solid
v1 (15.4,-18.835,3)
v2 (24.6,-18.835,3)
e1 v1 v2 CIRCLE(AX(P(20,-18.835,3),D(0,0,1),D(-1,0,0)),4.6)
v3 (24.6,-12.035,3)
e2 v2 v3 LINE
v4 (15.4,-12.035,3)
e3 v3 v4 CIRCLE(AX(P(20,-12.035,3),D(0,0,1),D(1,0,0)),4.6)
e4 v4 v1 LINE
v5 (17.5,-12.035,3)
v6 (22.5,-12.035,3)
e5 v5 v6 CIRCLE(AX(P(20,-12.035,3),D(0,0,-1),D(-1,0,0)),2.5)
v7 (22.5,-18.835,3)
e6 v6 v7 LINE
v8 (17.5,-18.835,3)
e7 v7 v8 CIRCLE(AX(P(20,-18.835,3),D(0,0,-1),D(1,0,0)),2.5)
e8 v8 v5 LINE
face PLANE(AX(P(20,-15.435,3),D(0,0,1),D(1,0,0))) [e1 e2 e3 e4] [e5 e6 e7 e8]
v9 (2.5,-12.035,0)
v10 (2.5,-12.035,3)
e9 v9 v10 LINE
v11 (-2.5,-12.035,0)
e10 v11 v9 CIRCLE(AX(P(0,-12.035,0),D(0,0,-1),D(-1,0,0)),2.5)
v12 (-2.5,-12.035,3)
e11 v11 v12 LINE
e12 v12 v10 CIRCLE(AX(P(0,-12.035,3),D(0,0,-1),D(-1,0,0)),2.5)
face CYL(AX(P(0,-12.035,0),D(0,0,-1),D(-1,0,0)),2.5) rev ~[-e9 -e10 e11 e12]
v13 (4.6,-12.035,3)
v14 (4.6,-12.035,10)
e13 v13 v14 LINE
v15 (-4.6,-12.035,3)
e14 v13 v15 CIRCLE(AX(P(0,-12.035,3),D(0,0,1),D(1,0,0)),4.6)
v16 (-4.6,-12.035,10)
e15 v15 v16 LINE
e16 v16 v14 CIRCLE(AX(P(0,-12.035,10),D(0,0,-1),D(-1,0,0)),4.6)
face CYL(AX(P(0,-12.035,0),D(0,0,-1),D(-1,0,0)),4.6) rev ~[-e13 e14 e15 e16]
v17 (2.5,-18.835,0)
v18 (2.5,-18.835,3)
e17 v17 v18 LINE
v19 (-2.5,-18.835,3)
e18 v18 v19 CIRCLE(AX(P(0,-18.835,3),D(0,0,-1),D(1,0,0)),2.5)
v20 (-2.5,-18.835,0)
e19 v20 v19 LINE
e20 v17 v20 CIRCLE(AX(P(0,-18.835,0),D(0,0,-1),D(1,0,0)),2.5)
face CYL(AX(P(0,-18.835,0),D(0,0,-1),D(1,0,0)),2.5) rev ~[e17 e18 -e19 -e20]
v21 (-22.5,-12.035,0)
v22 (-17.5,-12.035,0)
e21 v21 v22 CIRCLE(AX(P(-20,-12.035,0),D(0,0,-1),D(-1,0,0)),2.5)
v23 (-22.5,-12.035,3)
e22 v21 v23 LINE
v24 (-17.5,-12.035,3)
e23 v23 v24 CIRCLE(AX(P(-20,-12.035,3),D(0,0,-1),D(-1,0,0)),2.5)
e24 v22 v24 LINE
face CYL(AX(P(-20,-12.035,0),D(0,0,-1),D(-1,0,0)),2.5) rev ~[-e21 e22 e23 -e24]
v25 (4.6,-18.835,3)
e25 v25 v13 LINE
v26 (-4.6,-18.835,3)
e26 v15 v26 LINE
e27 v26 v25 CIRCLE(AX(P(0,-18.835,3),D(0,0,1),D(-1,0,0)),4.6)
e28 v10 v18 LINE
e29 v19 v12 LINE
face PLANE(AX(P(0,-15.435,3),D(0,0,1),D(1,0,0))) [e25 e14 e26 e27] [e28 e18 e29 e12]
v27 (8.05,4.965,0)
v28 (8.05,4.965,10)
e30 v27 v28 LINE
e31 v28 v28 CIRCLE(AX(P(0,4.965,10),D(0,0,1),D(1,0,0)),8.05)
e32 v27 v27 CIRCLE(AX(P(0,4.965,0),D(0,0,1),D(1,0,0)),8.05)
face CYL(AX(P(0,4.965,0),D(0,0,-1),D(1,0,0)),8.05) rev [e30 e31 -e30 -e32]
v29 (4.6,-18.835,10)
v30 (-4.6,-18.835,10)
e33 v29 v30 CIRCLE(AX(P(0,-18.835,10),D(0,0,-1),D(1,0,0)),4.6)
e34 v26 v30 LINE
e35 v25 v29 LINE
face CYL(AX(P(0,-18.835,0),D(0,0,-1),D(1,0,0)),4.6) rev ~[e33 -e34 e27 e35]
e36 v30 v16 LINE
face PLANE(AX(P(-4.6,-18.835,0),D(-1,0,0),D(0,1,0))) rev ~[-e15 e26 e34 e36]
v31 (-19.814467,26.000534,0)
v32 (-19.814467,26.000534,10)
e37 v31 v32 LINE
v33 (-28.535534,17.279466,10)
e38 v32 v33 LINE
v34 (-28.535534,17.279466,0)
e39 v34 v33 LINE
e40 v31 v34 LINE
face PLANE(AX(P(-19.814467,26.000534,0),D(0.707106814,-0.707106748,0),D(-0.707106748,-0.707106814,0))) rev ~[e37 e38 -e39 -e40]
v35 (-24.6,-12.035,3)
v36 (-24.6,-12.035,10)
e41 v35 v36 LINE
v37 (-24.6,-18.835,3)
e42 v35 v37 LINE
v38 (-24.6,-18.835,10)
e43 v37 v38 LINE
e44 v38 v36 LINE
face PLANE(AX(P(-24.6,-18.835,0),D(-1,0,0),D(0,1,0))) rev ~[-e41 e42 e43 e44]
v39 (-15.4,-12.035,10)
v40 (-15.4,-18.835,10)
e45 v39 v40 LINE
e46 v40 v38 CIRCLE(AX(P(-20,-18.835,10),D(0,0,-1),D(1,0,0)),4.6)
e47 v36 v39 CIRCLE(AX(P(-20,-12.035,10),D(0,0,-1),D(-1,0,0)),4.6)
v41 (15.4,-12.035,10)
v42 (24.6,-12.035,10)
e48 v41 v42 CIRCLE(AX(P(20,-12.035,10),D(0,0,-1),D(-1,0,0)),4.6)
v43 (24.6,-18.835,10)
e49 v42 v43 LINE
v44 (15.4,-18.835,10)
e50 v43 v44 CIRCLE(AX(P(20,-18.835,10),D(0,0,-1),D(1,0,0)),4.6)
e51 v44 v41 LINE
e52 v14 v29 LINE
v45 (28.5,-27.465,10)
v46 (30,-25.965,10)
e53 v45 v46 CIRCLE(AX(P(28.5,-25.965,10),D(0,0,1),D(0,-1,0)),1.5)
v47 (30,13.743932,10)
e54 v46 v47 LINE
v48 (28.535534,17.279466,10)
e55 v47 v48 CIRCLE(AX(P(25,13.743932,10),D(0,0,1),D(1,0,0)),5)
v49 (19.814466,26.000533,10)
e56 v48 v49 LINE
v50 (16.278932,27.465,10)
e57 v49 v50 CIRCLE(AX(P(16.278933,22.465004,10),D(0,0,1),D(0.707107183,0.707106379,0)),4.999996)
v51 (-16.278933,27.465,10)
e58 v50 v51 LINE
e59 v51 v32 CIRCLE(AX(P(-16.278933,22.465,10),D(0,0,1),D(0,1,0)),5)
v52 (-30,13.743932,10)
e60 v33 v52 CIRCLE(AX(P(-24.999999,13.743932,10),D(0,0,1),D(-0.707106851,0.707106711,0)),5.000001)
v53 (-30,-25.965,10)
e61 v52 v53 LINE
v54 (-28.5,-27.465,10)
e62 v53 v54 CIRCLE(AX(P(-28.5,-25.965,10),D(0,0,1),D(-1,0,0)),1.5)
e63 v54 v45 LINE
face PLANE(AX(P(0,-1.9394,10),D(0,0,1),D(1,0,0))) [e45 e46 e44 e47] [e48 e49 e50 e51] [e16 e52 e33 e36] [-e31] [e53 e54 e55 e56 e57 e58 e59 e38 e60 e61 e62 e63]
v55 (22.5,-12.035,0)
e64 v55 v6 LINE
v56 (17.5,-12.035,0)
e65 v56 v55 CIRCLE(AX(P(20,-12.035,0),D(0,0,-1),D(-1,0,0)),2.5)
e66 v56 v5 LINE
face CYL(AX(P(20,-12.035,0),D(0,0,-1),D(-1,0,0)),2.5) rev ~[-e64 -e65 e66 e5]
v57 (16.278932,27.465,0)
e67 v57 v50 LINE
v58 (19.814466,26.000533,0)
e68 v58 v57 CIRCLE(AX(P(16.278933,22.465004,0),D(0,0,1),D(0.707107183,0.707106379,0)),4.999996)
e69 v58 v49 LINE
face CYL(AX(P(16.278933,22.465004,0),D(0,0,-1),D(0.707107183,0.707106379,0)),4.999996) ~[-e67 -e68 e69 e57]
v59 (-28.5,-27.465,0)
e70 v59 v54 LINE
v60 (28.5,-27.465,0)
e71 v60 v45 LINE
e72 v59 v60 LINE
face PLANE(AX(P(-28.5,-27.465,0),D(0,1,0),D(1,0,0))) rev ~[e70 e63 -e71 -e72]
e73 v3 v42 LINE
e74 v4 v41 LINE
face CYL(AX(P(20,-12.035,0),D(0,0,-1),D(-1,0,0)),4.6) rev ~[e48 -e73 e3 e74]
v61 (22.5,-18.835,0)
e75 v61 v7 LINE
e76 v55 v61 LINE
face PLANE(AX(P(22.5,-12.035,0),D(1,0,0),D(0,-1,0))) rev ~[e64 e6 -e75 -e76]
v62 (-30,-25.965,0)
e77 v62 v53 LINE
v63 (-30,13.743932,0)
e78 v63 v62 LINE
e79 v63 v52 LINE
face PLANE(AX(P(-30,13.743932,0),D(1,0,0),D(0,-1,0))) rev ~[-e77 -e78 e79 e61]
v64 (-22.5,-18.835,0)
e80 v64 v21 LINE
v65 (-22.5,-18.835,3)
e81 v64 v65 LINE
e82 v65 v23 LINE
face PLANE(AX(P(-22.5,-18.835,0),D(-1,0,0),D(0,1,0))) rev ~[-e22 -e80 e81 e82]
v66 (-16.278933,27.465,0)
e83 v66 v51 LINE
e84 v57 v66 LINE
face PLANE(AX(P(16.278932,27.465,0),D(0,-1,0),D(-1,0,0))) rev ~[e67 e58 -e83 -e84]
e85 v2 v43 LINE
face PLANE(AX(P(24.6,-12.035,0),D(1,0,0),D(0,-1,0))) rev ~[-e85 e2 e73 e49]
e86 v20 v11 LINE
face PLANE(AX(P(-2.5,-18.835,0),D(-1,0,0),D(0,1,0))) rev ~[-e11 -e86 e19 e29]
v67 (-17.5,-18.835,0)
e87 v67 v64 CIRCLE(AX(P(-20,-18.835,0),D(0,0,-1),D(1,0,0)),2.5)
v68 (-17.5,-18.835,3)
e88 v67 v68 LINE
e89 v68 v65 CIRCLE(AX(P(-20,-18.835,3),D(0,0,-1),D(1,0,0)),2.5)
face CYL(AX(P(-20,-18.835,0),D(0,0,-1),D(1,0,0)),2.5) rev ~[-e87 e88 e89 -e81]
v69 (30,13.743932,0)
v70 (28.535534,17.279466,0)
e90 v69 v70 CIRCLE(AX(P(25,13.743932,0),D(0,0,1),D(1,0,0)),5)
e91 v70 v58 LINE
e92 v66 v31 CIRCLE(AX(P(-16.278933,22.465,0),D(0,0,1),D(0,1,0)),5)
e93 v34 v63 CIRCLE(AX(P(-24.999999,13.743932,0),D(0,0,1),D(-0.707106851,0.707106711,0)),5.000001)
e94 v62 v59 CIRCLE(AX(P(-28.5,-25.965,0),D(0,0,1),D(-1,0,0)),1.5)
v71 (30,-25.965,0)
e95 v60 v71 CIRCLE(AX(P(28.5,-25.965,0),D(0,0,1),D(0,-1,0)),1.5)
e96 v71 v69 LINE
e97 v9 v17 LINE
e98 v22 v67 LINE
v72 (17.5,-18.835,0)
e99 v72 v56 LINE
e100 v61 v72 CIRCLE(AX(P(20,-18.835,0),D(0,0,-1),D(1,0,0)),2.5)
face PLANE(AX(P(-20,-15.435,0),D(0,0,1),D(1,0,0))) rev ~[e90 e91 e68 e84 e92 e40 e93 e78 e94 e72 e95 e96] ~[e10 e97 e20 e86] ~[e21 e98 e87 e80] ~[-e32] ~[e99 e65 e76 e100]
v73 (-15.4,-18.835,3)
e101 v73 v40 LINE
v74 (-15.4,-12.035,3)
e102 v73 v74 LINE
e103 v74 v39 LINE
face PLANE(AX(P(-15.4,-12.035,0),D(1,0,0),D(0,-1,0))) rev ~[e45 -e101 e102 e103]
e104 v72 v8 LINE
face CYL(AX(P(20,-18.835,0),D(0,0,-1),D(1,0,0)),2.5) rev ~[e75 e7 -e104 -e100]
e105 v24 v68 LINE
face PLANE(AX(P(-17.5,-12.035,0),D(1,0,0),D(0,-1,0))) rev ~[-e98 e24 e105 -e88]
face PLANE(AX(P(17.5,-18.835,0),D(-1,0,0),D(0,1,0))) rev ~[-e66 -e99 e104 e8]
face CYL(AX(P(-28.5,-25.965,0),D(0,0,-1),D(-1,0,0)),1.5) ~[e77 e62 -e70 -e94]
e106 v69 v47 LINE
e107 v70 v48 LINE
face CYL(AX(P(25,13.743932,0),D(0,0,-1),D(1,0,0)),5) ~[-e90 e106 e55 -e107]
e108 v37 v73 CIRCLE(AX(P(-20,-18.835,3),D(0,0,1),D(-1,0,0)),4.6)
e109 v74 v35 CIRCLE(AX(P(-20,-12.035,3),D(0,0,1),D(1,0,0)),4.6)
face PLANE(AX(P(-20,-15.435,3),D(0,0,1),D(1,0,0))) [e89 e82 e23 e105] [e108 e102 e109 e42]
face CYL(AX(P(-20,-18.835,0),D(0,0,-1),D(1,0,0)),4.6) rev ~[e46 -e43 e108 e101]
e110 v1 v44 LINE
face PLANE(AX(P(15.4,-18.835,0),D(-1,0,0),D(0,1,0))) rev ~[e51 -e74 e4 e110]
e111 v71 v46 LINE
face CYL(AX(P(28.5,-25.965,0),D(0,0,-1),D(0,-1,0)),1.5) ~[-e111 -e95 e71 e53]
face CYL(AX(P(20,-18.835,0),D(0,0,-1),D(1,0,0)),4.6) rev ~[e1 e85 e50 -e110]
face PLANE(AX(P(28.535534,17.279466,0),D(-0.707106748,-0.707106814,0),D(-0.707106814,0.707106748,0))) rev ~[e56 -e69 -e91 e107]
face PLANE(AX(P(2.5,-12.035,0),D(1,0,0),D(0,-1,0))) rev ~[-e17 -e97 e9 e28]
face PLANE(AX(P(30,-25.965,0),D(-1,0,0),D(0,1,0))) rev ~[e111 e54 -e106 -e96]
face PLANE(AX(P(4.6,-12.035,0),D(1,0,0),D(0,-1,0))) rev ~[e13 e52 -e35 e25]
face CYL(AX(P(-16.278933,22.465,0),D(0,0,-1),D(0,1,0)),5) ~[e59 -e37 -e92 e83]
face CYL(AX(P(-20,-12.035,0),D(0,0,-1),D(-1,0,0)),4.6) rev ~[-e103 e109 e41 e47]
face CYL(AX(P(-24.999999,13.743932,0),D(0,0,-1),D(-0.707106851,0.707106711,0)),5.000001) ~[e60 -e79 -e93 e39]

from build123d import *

# Parameters (mm, degrees)
F0_R     = 8.05
F1_DEPTH = 10
F2_DEPTH = 3


# Not quite as in the source:
# - ends of sketch curves that miss each other by under 0.0002 mm in the source are joined


with BuildPart() as f1:
    # F0 (on Top) → F1 (new body)
    with BuildSketch(Plane.XY):
        with BuildLine():
            ThreePointArc((-16.278933, 27.465), (-18.1923501618, 27.0843976626), (-19.8144669059, 26.0005339059))
            Line((-19.8144669059, 26.0005339059), (-28.535534, 17.279466))
            ThreePointArc((-28.535534, 17.279466), (-29.6193976626, 15.6573491618), (-30, 13.743932))
            Line((-30, 13.743932), (-30, -25.965))
            ThreePointArc((-30, -25.965), (-29.5606601718, -27.0256601718), (-28.5, -27.465))
            Line((-28.5, -27.465), (28.5, -27.465))
            ThreePointArc((28.5, -27.465), (29.5606601718, -27.0256601718), (30, -25.965))
            Line((30, -25.965), (30, 13.743932))
            ThreePointArc((30, 13.743932), (29.6193976626, 15.6573491618), (28.5355339059, 17.2794659059))
            Line((28.5355339059, 17.2794659059), (19.814466, 26.000533))
            ThreePointArc((19.814466, 26.000533), (18.1923494885, 27.0843975273), (16.278932, 27.465))
            Line((16.278932, 27.465), (-16.278933, 27.465))
        make_face()
        with BuildLine():
            ThreePointArc((-24.6, -12.035), (-20, -7.435), (-15.4, -12.035))
            Line((-15.4, -12.035), (-15.4, -18.835))
            ThreePointArc((-15.4, -18.835), (-20, -23.435), (-24.6, -18.835))
            Line((-24.6, -18.835), (-24.6, -12.035))
        make_face(mode=Mode.SUBTRACT)
        with BuildLine():
            ThreePointArc((4.6, -18.835), (0, -23.435), (-4.6, -18.835))
            Line((-4.6, -18.835), (-4.6, -12.035))
            ThreePointArc((-4.6, -12.035), (0, -7.435), (4.6, -12.035))
            Line((4.6, -12.035), (4.6, -18.835))
        make_face(mode=Mode.SUBTRACT)
        with BuildLine():
            ThreePointArc((15.4, -12.035), (20, -7.435), (24.6, -12.035))
            Line((24.6, -12.035), (24.6, -18.835))
            ThreePointArc((24.6, -18.835), (20, -23.435), (15.4, -18.835))
            Line((15.4, -18.835), (15.4, -12.035))
        make_face(mode=Mode.SUBTRACT)
        with Locations((0, 4.965)):
            Circle(F0_R, mode=Mode.SUBTRACT)
    extrude(amount=F1_DEPTH)

    # F0 (on Top) → F2 (join)
    with BuildSketch(Plane.XY):
        with BuildLine():
            Line((-15.4, -18.835), (-15.4, -12.035))
            ThreePointArc((-15.4, -12.035), (-20, -7.435), (-24.6, -12.035))
            Line((-24.6, -12.035), (-24.6, -18.835))
            ThreePointArc((-24.6, -18.835), (-20, -23.435), (-15.4, -18.835))
        make_face()
        with BuildLine():
            ThreePointArc((-17.5, -18.835), (-20, -21.335), (-22.5, -18.835))
            Line((-22.5, -18.835), (-22.5, -12.035))
            ThreePointArc((-22.5, -12.035), (-20, -9.535), (-17.5, -12.035))
            Line((-17.5, -12.035), (-17.5, -18.835))
        make_face(mode=Mode.SUBTRACT)
        with BuildLine():
            Line((-4.6, -12.035), (-4.6, -18.835))
            ThreePointArc((-4.6, -18.835), (0, -23.435), (4.6, -18.835))
            Line((4.6, -18.835), (4.6, -12.035))
            ThreePointArc((4.6, -12.035), (0, -7.435), (-4.6, -12.035))
        make_face()
        with BuildLine():
            ThreePointArc((2.5, -18.835), (0, -21.335), (-2.5, -18.835))
            Line((-2.5, -18.835), (-2.5, -12.035))
            ThreePointArc((-2.5, -12.035), (0, -9.535), (2.5, -12.035))
            Line((2.5, -12.035), (2.5, -18.835))
        make_face(mode=Mode.SUBTRACT)
        with BuildLine():
            Line((24.6, -18.835), (24.6, -12.035))
            ThreePointArc((24.6, -12.035), (20, -7.435), (15.4, -12.035))
            Line((15.4, -12.035), (15.4, -18.835))
            ThreePointArc((15.4, -18.835), (20, -23.435), (24.6, -18.835))
        make_face()
        with BuildLine():
            ThreePointArc((22.5, -18.835), (20, -21.335), (17.5, -18.835))
            Line((17.5, -18.835), (17.5, -12.035))
            ThreePointArc((17.5, -12.035), (20, -9.535), (22.5, -12.035))
            Line((22.5, -12.035), (22.5, -18.835))
        make_face(mode=Mode.SUBTRACT)
    extrude(amount=F2_DEPTH)


solid = f1.part
